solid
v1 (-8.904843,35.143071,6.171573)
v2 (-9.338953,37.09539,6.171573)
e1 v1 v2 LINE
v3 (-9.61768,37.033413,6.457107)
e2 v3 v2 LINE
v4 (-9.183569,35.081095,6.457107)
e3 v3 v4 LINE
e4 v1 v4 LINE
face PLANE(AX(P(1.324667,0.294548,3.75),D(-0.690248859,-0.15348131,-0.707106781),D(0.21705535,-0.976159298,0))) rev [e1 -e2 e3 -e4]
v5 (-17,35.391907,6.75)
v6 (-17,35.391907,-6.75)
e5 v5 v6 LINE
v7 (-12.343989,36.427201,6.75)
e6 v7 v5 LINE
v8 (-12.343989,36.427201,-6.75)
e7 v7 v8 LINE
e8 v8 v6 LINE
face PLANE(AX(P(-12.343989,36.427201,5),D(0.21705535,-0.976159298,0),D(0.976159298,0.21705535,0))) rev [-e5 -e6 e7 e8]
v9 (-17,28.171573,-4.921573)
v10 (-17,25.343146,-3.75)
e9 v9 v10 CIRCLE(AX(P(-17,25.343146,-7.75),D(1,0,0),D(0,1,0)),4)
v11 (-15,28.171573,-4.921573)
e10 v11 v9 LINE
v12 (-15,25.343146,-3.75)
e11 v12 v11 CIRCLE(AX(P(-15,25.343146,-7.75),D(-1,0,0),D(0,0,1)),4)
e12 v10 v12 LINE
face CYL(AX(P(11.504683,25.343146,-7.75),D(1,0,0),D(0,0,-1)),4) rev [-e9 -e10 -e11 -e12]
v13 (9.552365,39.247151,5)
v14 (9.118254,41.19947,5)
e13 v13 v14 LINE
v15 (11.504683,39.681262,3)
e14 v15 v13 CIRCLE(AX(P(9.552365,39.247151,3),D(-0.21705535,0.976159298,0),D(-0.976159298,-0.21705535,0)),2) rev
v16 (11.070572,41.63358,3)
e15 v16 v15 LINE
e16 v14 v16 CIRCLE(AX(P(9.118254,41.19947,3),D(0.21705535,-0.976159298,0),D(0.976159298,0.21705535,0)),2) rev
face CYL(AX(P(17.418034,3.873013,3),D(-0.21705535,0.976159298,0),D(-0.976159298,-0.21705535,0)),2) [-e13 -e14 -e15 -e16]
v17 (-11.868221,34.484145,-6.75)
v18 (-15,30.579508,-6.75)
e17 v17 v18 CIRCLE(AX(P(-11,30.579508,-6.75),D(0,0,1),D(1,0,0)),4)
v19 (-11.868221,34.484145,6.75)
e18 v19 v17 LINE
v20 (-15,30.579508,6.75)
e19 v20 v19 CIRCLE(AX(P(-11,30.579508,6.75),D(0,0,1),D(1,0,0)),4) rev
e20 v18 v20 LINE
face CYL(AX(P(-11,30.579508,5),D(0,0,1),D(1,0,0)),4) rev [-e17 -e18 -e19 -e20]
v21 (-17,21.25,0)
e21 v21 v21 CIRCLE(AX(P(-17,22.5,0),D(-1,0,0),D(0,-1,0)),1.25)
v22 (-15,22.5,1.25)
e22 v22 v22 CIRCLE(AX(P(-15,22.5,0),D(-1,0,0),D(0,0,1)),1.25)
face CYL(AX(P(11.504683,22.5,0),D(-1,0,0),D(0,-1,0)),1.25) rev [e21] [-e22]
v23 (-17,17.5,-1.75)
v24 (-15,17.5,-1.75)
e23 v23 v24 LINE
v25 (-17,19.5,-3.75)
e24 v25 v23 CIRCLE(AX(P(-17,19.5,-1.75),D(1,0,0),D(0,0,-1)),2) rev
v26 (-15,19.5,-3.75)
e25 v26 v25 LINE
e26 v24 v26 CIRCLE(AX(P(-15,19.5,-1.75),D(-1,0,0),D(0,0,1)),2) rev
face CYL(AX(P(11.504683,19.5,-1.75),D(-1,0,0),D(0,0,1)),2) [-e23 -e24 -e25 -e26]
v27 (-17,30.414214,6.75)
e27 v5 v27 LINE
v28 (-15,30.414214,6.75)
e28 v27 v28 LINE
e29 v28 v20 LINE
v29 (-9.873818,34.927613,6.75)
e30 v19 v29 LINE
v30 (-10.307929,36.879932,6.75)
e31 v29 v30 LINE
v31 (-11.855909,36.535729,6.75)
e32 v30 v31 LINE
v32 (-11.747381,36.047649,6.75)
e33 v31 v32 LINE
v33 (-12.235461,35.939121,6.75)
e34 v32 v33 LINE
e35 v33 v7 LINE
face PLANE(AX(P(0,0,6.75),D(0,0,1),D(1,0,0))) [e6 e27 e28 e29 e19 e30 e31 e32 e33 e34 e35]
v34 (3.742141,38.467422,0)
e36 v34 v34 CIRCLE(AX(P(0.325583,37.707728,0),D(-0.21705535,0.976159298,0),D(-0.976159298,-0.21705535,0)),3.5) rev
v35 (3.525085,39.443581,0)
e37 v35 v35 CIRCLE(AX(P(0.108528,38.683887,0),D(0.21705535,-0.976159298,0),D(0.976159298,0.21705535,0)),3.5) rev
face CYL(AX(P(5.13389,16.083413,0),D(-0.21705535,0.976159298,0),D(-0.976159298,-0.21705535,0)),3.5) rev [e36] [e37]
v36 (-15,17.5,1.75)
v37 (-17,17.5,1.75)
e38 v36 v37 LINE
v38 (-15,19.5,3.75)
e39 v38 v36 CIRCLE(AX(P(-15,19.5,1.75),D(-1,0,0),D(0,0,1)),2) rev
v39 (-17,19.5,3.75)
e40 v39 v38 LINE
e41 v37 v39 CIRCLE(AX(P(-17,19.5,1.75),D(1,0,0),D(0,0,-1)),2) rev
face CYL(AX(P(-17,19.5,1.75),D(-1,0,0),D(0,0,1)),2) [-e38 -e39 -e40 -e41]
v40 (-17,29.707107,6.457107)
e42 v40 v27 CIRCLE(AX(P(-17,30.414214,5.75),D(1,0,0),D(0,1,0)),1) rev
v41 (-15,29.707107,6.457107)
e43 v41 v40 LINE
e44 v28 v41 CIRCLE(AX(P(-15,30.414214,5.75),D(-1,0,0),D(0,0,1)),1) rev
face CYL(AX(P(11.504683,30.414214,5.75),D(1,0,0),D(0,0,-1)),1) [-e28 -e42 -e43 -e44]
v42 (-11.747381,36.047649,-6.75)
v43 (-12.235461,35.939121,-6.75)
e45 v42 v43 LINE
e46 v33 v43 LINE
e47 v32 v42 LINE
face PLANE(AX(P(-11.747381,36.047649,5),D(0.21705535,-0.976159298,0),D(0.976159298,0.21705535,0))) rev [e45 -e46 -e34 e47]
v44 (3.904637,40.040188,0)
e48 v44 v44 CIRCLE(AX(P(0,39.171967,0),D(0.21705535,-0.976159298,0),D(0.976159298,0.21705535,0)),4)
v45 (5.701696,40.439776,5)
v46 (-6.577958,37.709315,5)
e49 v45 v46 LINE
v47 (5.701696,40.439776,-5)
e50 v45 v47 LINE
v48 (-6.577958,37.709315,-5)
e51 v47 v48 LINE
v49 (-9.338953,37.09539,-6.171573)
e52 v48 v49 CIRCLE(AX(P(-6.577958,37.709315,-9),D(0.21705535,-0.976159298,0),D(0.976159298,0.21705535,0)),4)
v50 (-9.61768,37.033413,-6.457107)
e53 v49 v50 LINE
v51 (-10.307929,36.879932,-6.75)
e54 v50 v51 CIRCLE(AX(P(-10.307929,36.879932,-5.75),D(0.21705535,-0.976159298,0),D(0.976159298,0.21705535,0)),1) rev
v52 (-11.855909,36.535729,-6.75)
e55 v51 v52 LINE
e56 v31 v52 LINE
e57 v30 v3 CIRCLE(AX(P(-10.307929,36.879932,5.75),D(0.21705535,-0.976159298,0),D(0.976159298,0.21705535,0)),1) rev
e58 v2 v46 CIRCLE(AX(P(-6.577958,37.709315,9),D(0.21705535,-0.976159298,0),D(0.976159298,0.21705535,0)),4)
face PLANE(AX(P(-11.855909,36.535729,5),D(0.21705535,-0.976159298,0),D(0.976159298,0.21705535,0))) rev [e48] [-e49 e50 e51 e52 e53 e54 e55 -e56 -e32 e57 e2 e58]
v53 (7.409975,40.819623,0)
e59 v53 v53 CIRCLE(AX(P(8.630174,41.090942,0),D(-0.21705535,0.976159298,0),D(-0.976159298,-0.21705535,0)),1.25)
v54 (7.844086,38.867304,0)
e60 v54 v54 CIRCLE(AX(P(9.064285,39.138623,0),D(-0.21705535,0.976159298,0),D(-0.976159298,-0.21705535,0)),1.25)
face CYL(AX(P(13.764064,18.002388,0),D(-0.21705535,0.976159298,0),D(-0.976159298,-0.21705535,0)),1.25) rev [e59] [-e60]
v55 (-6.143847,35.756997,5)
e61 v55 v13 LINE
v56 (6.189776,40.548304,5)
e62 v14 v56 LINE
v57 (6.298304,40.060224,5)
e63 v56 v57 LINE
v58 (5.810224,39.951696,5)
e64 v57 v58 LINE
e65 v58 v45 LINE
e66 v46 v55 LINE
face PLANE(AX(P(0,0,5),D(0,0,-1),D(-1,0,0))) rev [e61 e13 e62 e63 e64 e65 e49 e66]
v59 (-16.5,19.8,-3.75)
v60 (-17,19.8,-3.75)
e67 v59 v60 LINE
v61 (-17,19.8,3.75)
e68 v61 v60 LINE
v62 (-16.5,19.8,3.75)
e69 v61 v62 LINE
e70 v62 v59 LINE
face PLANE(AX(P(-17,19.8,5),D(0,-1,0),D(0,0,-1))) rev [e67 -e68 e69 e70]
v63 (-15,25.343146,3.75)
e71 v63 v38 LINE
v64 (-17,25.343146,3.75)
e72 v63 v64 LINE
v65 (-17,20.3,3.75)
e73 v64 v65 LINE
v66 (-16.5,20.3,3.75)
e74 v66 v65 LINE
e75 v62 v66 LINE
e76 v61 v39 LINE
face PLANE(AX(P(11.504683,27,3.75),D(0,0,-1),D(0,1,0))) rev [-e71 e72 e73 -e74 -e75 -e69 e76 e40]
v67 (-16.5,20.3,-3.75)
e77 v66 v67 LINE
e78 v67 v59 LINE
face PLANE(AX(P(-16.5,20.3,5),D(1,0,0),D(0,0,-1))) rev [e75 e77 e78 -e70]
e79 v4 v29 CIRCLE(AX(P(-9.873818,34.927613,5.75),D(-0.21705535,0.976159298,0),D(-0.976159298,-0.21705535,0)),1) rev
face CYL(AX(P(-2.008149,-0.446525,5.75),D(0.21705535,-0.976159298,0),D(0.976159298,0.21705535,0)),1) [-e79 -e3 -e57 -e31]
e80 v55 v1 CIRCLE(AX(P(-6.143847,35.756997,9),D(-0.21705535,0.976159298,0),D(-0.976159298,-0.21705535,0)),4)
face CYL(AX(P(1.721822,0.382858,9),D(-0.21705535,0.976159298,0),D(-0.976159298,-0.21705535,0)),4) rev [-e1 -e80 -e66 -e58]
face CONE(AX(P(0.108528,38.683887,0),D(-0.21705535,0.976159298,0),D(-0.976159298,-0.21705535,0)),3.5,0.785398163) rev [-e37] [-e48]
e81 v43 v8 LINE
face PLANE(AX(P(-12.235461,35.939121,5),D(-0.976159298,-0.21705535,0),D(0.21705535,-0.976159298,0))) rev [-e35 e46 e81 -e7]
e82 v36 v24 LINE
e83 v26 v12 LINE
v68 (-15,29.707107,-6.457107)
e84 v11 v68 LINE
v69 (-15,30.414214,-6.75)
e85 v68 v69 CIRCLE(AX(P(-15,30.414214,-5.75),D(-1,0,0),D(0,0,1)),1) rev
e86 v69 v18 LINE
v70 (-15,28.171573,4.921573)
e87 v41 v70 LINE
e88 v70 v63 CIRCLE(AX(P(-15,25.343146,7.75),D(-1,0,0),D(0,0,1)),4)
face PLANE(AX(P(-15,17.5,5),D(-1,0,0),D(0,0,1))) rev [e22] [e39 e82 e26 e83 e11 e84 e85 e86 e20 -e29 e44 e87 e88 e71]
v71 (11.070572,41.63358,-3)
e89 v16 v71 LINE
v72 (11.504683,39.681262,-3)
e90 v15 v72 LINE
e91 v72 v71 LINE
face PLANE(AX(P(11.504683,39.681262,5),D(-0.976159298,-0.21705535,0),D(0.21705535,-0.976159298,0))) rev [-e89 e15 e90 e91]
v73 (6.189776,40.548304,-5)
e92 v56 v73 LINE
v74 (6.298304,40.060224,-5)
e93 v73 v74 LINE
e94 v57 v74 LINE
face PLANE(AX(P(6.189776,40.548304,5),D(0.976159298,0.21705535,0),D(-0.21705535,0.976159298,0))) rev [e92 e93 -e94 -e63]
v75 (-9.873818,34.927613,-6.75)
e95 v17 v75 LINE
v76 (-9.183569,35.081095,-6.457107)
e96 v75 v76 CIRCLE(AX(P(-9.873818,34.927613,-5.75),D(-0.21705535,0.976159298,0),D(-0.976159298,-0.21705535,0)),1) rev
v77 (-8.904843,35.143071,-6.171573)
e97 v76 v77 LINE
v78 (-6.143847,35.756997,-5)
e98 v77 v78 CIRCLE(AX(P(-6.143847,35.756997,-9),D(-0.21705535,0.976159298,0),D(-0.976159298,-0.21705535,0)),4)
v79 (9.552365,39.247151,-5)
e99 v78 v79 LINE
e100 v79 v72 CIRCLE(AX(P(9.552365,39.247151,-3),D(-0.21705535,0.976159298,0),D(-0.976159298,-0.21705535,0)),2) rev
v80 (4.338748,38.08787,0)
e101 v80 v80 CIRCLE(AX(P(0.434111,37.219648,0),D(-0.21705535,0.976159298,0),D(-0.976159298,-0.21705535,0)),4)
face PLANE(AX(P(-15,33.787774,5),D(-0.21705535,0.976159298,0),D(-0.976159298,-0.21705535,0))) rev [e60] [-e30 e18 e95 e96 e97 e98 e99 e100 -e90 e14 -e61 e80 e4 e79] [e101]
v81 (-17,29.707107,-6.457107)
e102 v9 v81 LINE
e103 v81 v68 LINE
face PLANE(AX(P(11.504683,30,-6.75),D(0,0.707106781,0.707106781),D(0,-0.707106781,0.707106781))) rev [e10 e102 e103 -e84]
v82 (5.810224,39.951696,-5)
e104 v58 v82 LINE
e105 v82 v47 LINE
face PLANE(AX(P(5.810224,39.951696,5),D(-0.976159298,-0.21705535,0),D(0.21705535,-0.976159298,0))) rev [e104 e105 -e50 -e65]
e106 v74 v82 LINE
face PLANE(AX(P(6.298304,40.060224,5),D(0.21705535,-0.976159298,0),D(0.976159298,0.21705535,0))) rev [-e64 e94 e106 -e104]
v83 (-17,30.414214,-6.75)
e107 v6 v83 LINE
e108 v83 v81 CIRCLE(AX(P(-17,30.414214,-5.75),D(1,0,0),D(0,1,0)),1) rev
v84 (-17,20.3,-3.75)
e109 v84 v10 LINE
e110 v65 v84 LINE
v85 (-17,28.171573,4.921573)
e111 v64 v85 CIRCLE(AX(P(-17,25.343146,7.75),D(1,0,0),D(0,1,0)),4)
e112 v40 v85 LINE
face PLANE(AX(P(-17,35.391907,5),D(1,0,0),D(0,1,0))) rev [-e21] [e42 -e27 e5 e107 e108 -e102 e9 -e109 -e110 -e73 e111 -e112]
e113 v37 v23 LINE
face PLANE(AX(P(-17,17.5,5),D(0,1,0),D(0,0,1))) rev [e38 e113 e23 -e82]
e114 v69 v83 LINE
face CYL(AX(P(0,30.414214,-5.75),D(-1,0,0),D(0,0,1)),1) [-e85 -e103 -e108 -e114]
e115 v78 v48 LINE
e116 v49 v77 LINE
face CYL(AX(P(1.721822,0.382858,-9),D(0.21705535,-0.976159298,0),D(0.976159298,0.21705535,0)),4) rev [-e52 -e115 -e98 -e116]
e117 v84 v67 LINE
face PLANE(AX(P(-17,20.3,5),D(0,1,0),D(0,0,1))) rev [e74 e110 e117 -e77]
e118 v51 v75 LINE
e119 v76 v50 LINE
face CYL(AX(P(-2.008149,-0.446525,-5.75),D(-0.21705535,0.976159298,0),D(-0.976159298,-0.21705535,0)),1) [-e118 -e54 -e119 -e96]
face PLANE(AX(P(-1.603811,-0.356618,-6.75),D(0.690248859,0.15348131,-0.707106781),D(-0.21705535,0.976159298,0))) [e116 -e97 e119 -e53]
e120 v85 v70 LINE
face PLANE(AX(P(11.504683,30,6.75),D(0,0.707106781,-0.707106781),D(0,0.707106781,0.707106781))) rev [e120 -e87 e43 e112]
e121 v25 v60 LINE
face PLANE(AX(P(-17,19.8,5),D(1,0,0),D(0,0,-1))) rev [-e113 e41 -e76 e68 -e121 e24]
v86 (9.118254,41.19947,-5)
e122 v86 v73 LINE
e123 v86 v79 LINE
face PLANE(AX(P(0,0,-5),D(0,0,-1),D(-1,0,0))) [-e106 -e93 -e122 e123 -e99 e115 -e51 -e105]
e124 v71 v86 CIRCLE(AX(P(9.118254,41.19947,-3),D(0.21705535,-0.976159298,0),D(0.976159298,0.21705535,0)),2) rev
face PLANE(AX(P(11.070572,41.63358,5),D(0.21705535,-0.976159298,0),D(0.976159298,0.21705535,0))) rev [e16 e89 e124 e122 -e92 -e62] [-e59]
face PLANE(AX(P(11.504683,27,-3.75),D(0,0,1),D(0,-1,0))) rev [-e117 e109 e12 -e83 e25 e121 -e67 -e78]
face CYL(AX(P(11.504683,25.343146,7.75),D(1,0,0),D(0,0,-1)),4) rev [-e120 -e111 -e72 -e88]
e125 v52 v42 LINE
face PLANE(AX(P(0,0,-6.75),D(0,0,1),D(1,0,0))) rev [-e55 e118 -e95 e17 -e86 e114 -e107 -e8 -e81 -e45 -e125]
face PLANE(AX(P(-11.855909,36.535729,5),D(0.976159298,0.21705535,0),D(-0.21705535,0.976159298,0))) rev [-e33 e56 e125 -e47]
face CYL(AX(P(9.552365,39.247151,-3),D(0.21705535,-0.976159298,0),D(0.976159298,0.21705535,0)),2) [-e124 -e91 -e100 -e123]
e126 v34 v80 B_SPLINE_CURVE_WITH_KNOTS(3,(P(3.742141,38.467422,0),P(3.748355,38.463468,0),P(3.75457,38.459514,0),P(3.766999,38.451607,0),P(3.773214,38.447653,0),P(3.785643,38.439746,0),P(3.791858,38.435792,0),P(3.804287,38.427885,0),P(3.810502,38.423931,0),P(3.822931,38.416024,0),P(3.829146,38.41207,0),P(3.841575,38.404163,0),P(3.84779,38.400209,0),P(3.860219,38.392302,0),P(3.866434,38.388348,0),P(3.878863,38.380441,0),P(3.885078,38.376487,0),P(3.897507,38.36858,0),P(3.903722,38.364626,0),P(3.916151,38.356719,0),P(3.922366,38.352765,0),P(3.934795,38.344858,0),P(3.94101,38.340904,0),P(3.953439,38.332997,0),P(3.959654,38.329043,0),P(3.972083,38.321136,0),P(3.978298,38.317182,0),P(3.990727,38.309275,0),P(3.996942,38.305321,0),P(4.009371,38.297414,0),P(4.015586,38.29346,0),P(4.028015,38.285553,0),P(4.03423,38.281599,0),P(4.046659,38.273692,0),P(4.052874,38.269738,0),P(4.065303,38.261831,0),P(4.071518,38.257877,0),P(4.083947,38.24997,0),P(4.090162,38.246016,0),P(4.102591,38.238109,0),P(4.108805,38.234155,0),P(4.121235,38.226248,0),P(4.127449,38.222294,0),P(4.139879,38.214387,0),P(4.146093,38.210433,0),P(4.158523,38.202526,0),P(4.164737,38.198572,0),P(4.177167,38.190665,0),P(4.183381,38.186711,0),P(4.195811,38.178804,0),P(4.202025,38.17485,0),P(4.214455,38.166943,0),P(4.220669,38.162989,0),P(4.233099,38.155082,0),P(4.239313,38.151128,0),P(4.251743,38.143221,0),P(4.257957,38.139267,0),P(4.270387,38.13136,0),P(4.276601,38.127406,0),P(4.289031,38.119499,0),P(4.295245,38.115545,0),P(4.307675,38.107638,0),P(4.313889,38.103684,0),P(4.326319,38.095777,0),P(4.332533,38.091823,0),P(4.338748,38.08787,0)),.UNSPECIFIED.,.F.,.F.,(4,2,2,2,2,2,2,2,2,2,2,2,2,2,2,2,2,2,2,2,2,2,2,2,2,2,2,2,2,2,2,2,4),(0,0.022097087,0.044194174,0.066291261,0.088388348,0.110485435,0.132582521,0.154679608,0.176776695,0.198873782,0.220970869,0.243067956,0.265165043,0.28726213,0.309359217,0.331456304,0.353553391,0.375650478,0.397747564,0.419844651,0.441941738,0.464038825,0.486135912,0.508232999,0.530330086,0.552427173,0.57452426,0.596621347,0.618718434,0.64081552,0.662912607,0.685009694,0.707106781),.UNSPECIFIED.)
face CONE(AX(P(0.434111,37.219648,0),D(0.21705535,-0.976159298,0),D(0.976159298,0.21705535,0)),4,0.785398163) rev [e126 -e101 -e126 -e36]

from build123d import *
from OCP.BRepFilletAPI import BRepFilletAPI_MakeFillet

# Parameters (mm, degrees)
BOSS_EXTRUDE1_DEPTH = 5
BOSS_EXTRUDE2_DEPTH = 6.75
CHAMFER1_SIZE       = 3
CUT_EXTRUDE1_DEPTH  = 51.906134019
FILLET1_R1          = 1
FILLET1_R2          = 4
FILLET2_R           = 4
FILLET3_R           = 2
SKETCH5_R           = 1.25
CUT_EXTRUDE2_DEPTH  = 51.906134019
SKETCH6_R           = 1.25
CUT_EXTRUDE3_DEPTH  = 29.824774908
FILLET4_R           = 2
SKETCH7_R           = 3.5
CUT_EXTRUDE4_DEPTH  = 29.824774908
CHAMFER2_SIZE       = 0.5


with BuildPart() as part:
    # Sketch1 → Boss-Extrude1 (new, symmetric)
    with BuildSketch(Plane.XY):
        Polygon((-15, 33.787773645), (11.504683177, 39.681261814), (11.070572477, 41.63358041), (6.189775987, 40.548303662), (6.298303662, 40.060224013), (5.810224013, 39.951696338), (5.701696338, 40.439775987), (-11.855909094, 36.53572857), (-11.747381419, 36.047648921), (-12.235461068, 35.939121246), (-12.343988743, 36.427200895), (-17, 35.391906601), (-17, 20.3), (-16.5, 20.3), (-16.5, 19.8), (-17, 19.8), (-17, 17.5), (-15, 17.5), align=None)
    extrude(amount=BOSS_EXTRUDE1_DEPTH, both=True)

    # Sketch3 → Boss-Extrude2 (add, symmetric)
    with BuildSketch(Plane.XY):
        Polygon((-6.541001904, 35.668686722), (-6.975112604, 37.621005318), (-11.855909094, 36.53572857), (-11.747381419, 36.047648921), (-12.235461068, 35.939121246), (-12.343988743, 36.427200895), (-17, 35.391906601), (-17, 20.3), (-16.5, 20.3), (-16.5, 19.8), (-17, 19.8), (-17, 17.5), (-15, 17.5), (-15, 33.787773645), align=None)
    extrude(amount=BOSS_EXTRUDE2_DEPTH, both=True)

    # Chamfer1
    # the kernel refuses this chamfer: 3 mm, written as the material it takes off along each edge
    with BuildSketch(Plane(origin=(-4.866409254, 28.137569941, -6.75), x_dir=(0.0268403556117362, 0.005968127111591266, 0.9996219169112968), z_dir=(-0.21705534964808215, 0.9761592980600804, 0))) as chamfer1_piece_1_section:
        Polygon((CHAMFER1_SIZE * 0.999621916911, -CHAMFER1_SIZE * 0.0274958766106), (-CHAMFER1_SIZE * 0.0274958766106, -CHAMFER1_SIZE * 0.999621916911), (0, 0), align=None)
    chamfer1_piece_1 = extrude(amount=17.430097928, mode=Mode.PRIVATE)
    chamfer1_piece_1 = split(chamfer1_piece_1, bisect_by=Plane(origin=(-7.864790055, 36.398756806, -5), z_dir=(0, 0, -1)), keep=Keep.TOP, mode=Mode.PRIVATE)
    add(chamfer1_piece_1, mode=Mode.SUBTRACT)
    with BuildSketch(Plane(origin=(-4.866409254, 28.137569941, 6.75), x_dir=(-0.9757902287376033, -0.2169732846910676, 0.02749587661058649), z_dir=(-0.21705534964808215, 0.9761592980600804, 0))) as chamfer1_piece_2_section:
        Polygon((CHAMFER1_SIZE * 0.999621916911, -CHAMFER1_SIZE * 0.0274958766106), (-CHAMFER1_SIZE * 0.0274958766106, -CHAMFER1_SIZE * 0.999621916911), (0, 0), align=None)
    chamfer1_piece_2 = extrude(amount=17.430097928, mode=Mode.PRIVATE)
    chamfer1_piece_2 = split(chamfer1_piece_2, bisect_by=Plane(origin=(-7.864790055, 36.398756806, 5), z_dir=(0, 0, 1)), keep=Keep.TOP, mode=Mode.PRIVATE)
    add(chamfer1_piece_2, mode=Mode.SUBTRACT)

    # Sketch4 → Cut-Extrude1 (cut, through all)
    with BuildSketch(Plane.ZY.offset(17)):
        Polygon((-6.75, 30), (-3.75, 27), (-3.75, 17.5), (3.75, 17.5), (3.75, 27), (6.75, 30), (6.75, 0), (-6.75, 0), align=None)
    extrude(amount=-CUT_EXTRUDE1_DEPTH, mode=Mode.SUBTRACT)

    # Fillet1: one fillet with a radius per group of edges: ONE call of the kernel's fillet builder (fillet() takes one radius for all edges)
    fillet1_edges_1 = [part.edges().sort_by_distance(p)[0] for p in [
        (-9.686535148, 35.993679971, -6.75),
        (-9.686535148, 35.993679971, 6.75),
        (-16, 30, 6.75),
        (-16, 30, -6.75),
    ]]
    fillet1_edges_2 = [part.edges().sort_by_distance(p)[0] for p in [
        (-7.978256377, 36.373526833, 5),
        (-7.978256377, 36.373526833, -5),
        (-16, 27, -3.75),
        (-16, 27, 3.75),
    ]]
    fillet1 = BRepFilletAPI_MakeFillet(part.part.solid().wrapped)
    for e in fillet1_edges_1:
        fillet1.Add(FILLET1_R1, e.wrapped)
    for e in fillet1_edges_2:
        fillet1.Add(FILLET1_R2, e.wrapped)
    add(Compound.cast(fillet1.Shape()), mode=Mode.REPLACE)

    # Fillet2
    fillet2_edges = [part.edges().sort_by_distance(p)[0] for p in [
        (-15, 33.787773645, 0),
    ]]
    fillet(fillet2_edges, radius=FILLET2_R)

    # Fillet3
    fillet3_edges = [part.edges().sort_by_distance(p)[0] for p in [
        (-16, 17.5, -3.75),
        (-16, 17.5, 3.75),
    ]]
    fillet(fillet3_edges, radius=FILLET3_R)

    # Sketch5 → Cut-Extrude2 (cut, through all)
    with BuildSketch(Plane.ZY.offset(17)):
        with Locations(Location((0, 22.5, 0), (0, 0, 270))):
            Circle(SKETCH5_R)
    extrude(amount=-CUT_EXTRUDE2_DEPTH, mode=Mode.SUBTRACT)

    # Sketch6 → Cut-Extrude3 (cut, through all)
    with BuildSketch(Plane(origin=(-8.299779748, 37.326456989, 0), x_dir=(0.9761592980600814, 0.21705534964807782, 0), z_dir=(-0.21705534964807782, 0.9761592980600814, 0))):
        with Locations(Location((17.343433612, 0, 0), (0, 0, 180))):
            Circle(SKETCH6_R)
    extrude(amount=-CUT_EXTRUDE3_DEPTH, mode=Mode.SUBTRACT)

    # Fillet4
    fillet4_edges = [part.edges().sort_by_distance(p)[0] for p in [
        (11.287627827, 40.657421112, -5),
        (11.287627827, 40.657421112, 5),
    ]]
    fillet(fillet4_edges, radius=FILLET4_R)

    # Sketch7 → Cut-Extrude4 (cut, through all)
    with BuildSketch(Plane(origin=(-8.299779748, 37.326456989, 0), x_dir=(0.9761592980600813, 0.21705534964807838, 0), z_dir=(-0.21705534964807838, 0.9761592980600813, 0))):
        with Locations(Location((8.502484958, 0, 0), (0, 0, 180))):
            Circle(SKETCH7_R)
    extrude(amount=-CUT_EXTRUDE4_DEPTH, mode=Mode.SUBTRACT)

    # Chamfer2
    chamfer2_edges = [part.edges().sort_by_distance(p)[0] for p in [
        (3.850668243, 37.979341962, 0),
        (3.416557543, 39.931660559, 0),
    ]]
    chamfer(chamfer2_edges, length=CHAMFER2_SIZE)


solid = part.part
